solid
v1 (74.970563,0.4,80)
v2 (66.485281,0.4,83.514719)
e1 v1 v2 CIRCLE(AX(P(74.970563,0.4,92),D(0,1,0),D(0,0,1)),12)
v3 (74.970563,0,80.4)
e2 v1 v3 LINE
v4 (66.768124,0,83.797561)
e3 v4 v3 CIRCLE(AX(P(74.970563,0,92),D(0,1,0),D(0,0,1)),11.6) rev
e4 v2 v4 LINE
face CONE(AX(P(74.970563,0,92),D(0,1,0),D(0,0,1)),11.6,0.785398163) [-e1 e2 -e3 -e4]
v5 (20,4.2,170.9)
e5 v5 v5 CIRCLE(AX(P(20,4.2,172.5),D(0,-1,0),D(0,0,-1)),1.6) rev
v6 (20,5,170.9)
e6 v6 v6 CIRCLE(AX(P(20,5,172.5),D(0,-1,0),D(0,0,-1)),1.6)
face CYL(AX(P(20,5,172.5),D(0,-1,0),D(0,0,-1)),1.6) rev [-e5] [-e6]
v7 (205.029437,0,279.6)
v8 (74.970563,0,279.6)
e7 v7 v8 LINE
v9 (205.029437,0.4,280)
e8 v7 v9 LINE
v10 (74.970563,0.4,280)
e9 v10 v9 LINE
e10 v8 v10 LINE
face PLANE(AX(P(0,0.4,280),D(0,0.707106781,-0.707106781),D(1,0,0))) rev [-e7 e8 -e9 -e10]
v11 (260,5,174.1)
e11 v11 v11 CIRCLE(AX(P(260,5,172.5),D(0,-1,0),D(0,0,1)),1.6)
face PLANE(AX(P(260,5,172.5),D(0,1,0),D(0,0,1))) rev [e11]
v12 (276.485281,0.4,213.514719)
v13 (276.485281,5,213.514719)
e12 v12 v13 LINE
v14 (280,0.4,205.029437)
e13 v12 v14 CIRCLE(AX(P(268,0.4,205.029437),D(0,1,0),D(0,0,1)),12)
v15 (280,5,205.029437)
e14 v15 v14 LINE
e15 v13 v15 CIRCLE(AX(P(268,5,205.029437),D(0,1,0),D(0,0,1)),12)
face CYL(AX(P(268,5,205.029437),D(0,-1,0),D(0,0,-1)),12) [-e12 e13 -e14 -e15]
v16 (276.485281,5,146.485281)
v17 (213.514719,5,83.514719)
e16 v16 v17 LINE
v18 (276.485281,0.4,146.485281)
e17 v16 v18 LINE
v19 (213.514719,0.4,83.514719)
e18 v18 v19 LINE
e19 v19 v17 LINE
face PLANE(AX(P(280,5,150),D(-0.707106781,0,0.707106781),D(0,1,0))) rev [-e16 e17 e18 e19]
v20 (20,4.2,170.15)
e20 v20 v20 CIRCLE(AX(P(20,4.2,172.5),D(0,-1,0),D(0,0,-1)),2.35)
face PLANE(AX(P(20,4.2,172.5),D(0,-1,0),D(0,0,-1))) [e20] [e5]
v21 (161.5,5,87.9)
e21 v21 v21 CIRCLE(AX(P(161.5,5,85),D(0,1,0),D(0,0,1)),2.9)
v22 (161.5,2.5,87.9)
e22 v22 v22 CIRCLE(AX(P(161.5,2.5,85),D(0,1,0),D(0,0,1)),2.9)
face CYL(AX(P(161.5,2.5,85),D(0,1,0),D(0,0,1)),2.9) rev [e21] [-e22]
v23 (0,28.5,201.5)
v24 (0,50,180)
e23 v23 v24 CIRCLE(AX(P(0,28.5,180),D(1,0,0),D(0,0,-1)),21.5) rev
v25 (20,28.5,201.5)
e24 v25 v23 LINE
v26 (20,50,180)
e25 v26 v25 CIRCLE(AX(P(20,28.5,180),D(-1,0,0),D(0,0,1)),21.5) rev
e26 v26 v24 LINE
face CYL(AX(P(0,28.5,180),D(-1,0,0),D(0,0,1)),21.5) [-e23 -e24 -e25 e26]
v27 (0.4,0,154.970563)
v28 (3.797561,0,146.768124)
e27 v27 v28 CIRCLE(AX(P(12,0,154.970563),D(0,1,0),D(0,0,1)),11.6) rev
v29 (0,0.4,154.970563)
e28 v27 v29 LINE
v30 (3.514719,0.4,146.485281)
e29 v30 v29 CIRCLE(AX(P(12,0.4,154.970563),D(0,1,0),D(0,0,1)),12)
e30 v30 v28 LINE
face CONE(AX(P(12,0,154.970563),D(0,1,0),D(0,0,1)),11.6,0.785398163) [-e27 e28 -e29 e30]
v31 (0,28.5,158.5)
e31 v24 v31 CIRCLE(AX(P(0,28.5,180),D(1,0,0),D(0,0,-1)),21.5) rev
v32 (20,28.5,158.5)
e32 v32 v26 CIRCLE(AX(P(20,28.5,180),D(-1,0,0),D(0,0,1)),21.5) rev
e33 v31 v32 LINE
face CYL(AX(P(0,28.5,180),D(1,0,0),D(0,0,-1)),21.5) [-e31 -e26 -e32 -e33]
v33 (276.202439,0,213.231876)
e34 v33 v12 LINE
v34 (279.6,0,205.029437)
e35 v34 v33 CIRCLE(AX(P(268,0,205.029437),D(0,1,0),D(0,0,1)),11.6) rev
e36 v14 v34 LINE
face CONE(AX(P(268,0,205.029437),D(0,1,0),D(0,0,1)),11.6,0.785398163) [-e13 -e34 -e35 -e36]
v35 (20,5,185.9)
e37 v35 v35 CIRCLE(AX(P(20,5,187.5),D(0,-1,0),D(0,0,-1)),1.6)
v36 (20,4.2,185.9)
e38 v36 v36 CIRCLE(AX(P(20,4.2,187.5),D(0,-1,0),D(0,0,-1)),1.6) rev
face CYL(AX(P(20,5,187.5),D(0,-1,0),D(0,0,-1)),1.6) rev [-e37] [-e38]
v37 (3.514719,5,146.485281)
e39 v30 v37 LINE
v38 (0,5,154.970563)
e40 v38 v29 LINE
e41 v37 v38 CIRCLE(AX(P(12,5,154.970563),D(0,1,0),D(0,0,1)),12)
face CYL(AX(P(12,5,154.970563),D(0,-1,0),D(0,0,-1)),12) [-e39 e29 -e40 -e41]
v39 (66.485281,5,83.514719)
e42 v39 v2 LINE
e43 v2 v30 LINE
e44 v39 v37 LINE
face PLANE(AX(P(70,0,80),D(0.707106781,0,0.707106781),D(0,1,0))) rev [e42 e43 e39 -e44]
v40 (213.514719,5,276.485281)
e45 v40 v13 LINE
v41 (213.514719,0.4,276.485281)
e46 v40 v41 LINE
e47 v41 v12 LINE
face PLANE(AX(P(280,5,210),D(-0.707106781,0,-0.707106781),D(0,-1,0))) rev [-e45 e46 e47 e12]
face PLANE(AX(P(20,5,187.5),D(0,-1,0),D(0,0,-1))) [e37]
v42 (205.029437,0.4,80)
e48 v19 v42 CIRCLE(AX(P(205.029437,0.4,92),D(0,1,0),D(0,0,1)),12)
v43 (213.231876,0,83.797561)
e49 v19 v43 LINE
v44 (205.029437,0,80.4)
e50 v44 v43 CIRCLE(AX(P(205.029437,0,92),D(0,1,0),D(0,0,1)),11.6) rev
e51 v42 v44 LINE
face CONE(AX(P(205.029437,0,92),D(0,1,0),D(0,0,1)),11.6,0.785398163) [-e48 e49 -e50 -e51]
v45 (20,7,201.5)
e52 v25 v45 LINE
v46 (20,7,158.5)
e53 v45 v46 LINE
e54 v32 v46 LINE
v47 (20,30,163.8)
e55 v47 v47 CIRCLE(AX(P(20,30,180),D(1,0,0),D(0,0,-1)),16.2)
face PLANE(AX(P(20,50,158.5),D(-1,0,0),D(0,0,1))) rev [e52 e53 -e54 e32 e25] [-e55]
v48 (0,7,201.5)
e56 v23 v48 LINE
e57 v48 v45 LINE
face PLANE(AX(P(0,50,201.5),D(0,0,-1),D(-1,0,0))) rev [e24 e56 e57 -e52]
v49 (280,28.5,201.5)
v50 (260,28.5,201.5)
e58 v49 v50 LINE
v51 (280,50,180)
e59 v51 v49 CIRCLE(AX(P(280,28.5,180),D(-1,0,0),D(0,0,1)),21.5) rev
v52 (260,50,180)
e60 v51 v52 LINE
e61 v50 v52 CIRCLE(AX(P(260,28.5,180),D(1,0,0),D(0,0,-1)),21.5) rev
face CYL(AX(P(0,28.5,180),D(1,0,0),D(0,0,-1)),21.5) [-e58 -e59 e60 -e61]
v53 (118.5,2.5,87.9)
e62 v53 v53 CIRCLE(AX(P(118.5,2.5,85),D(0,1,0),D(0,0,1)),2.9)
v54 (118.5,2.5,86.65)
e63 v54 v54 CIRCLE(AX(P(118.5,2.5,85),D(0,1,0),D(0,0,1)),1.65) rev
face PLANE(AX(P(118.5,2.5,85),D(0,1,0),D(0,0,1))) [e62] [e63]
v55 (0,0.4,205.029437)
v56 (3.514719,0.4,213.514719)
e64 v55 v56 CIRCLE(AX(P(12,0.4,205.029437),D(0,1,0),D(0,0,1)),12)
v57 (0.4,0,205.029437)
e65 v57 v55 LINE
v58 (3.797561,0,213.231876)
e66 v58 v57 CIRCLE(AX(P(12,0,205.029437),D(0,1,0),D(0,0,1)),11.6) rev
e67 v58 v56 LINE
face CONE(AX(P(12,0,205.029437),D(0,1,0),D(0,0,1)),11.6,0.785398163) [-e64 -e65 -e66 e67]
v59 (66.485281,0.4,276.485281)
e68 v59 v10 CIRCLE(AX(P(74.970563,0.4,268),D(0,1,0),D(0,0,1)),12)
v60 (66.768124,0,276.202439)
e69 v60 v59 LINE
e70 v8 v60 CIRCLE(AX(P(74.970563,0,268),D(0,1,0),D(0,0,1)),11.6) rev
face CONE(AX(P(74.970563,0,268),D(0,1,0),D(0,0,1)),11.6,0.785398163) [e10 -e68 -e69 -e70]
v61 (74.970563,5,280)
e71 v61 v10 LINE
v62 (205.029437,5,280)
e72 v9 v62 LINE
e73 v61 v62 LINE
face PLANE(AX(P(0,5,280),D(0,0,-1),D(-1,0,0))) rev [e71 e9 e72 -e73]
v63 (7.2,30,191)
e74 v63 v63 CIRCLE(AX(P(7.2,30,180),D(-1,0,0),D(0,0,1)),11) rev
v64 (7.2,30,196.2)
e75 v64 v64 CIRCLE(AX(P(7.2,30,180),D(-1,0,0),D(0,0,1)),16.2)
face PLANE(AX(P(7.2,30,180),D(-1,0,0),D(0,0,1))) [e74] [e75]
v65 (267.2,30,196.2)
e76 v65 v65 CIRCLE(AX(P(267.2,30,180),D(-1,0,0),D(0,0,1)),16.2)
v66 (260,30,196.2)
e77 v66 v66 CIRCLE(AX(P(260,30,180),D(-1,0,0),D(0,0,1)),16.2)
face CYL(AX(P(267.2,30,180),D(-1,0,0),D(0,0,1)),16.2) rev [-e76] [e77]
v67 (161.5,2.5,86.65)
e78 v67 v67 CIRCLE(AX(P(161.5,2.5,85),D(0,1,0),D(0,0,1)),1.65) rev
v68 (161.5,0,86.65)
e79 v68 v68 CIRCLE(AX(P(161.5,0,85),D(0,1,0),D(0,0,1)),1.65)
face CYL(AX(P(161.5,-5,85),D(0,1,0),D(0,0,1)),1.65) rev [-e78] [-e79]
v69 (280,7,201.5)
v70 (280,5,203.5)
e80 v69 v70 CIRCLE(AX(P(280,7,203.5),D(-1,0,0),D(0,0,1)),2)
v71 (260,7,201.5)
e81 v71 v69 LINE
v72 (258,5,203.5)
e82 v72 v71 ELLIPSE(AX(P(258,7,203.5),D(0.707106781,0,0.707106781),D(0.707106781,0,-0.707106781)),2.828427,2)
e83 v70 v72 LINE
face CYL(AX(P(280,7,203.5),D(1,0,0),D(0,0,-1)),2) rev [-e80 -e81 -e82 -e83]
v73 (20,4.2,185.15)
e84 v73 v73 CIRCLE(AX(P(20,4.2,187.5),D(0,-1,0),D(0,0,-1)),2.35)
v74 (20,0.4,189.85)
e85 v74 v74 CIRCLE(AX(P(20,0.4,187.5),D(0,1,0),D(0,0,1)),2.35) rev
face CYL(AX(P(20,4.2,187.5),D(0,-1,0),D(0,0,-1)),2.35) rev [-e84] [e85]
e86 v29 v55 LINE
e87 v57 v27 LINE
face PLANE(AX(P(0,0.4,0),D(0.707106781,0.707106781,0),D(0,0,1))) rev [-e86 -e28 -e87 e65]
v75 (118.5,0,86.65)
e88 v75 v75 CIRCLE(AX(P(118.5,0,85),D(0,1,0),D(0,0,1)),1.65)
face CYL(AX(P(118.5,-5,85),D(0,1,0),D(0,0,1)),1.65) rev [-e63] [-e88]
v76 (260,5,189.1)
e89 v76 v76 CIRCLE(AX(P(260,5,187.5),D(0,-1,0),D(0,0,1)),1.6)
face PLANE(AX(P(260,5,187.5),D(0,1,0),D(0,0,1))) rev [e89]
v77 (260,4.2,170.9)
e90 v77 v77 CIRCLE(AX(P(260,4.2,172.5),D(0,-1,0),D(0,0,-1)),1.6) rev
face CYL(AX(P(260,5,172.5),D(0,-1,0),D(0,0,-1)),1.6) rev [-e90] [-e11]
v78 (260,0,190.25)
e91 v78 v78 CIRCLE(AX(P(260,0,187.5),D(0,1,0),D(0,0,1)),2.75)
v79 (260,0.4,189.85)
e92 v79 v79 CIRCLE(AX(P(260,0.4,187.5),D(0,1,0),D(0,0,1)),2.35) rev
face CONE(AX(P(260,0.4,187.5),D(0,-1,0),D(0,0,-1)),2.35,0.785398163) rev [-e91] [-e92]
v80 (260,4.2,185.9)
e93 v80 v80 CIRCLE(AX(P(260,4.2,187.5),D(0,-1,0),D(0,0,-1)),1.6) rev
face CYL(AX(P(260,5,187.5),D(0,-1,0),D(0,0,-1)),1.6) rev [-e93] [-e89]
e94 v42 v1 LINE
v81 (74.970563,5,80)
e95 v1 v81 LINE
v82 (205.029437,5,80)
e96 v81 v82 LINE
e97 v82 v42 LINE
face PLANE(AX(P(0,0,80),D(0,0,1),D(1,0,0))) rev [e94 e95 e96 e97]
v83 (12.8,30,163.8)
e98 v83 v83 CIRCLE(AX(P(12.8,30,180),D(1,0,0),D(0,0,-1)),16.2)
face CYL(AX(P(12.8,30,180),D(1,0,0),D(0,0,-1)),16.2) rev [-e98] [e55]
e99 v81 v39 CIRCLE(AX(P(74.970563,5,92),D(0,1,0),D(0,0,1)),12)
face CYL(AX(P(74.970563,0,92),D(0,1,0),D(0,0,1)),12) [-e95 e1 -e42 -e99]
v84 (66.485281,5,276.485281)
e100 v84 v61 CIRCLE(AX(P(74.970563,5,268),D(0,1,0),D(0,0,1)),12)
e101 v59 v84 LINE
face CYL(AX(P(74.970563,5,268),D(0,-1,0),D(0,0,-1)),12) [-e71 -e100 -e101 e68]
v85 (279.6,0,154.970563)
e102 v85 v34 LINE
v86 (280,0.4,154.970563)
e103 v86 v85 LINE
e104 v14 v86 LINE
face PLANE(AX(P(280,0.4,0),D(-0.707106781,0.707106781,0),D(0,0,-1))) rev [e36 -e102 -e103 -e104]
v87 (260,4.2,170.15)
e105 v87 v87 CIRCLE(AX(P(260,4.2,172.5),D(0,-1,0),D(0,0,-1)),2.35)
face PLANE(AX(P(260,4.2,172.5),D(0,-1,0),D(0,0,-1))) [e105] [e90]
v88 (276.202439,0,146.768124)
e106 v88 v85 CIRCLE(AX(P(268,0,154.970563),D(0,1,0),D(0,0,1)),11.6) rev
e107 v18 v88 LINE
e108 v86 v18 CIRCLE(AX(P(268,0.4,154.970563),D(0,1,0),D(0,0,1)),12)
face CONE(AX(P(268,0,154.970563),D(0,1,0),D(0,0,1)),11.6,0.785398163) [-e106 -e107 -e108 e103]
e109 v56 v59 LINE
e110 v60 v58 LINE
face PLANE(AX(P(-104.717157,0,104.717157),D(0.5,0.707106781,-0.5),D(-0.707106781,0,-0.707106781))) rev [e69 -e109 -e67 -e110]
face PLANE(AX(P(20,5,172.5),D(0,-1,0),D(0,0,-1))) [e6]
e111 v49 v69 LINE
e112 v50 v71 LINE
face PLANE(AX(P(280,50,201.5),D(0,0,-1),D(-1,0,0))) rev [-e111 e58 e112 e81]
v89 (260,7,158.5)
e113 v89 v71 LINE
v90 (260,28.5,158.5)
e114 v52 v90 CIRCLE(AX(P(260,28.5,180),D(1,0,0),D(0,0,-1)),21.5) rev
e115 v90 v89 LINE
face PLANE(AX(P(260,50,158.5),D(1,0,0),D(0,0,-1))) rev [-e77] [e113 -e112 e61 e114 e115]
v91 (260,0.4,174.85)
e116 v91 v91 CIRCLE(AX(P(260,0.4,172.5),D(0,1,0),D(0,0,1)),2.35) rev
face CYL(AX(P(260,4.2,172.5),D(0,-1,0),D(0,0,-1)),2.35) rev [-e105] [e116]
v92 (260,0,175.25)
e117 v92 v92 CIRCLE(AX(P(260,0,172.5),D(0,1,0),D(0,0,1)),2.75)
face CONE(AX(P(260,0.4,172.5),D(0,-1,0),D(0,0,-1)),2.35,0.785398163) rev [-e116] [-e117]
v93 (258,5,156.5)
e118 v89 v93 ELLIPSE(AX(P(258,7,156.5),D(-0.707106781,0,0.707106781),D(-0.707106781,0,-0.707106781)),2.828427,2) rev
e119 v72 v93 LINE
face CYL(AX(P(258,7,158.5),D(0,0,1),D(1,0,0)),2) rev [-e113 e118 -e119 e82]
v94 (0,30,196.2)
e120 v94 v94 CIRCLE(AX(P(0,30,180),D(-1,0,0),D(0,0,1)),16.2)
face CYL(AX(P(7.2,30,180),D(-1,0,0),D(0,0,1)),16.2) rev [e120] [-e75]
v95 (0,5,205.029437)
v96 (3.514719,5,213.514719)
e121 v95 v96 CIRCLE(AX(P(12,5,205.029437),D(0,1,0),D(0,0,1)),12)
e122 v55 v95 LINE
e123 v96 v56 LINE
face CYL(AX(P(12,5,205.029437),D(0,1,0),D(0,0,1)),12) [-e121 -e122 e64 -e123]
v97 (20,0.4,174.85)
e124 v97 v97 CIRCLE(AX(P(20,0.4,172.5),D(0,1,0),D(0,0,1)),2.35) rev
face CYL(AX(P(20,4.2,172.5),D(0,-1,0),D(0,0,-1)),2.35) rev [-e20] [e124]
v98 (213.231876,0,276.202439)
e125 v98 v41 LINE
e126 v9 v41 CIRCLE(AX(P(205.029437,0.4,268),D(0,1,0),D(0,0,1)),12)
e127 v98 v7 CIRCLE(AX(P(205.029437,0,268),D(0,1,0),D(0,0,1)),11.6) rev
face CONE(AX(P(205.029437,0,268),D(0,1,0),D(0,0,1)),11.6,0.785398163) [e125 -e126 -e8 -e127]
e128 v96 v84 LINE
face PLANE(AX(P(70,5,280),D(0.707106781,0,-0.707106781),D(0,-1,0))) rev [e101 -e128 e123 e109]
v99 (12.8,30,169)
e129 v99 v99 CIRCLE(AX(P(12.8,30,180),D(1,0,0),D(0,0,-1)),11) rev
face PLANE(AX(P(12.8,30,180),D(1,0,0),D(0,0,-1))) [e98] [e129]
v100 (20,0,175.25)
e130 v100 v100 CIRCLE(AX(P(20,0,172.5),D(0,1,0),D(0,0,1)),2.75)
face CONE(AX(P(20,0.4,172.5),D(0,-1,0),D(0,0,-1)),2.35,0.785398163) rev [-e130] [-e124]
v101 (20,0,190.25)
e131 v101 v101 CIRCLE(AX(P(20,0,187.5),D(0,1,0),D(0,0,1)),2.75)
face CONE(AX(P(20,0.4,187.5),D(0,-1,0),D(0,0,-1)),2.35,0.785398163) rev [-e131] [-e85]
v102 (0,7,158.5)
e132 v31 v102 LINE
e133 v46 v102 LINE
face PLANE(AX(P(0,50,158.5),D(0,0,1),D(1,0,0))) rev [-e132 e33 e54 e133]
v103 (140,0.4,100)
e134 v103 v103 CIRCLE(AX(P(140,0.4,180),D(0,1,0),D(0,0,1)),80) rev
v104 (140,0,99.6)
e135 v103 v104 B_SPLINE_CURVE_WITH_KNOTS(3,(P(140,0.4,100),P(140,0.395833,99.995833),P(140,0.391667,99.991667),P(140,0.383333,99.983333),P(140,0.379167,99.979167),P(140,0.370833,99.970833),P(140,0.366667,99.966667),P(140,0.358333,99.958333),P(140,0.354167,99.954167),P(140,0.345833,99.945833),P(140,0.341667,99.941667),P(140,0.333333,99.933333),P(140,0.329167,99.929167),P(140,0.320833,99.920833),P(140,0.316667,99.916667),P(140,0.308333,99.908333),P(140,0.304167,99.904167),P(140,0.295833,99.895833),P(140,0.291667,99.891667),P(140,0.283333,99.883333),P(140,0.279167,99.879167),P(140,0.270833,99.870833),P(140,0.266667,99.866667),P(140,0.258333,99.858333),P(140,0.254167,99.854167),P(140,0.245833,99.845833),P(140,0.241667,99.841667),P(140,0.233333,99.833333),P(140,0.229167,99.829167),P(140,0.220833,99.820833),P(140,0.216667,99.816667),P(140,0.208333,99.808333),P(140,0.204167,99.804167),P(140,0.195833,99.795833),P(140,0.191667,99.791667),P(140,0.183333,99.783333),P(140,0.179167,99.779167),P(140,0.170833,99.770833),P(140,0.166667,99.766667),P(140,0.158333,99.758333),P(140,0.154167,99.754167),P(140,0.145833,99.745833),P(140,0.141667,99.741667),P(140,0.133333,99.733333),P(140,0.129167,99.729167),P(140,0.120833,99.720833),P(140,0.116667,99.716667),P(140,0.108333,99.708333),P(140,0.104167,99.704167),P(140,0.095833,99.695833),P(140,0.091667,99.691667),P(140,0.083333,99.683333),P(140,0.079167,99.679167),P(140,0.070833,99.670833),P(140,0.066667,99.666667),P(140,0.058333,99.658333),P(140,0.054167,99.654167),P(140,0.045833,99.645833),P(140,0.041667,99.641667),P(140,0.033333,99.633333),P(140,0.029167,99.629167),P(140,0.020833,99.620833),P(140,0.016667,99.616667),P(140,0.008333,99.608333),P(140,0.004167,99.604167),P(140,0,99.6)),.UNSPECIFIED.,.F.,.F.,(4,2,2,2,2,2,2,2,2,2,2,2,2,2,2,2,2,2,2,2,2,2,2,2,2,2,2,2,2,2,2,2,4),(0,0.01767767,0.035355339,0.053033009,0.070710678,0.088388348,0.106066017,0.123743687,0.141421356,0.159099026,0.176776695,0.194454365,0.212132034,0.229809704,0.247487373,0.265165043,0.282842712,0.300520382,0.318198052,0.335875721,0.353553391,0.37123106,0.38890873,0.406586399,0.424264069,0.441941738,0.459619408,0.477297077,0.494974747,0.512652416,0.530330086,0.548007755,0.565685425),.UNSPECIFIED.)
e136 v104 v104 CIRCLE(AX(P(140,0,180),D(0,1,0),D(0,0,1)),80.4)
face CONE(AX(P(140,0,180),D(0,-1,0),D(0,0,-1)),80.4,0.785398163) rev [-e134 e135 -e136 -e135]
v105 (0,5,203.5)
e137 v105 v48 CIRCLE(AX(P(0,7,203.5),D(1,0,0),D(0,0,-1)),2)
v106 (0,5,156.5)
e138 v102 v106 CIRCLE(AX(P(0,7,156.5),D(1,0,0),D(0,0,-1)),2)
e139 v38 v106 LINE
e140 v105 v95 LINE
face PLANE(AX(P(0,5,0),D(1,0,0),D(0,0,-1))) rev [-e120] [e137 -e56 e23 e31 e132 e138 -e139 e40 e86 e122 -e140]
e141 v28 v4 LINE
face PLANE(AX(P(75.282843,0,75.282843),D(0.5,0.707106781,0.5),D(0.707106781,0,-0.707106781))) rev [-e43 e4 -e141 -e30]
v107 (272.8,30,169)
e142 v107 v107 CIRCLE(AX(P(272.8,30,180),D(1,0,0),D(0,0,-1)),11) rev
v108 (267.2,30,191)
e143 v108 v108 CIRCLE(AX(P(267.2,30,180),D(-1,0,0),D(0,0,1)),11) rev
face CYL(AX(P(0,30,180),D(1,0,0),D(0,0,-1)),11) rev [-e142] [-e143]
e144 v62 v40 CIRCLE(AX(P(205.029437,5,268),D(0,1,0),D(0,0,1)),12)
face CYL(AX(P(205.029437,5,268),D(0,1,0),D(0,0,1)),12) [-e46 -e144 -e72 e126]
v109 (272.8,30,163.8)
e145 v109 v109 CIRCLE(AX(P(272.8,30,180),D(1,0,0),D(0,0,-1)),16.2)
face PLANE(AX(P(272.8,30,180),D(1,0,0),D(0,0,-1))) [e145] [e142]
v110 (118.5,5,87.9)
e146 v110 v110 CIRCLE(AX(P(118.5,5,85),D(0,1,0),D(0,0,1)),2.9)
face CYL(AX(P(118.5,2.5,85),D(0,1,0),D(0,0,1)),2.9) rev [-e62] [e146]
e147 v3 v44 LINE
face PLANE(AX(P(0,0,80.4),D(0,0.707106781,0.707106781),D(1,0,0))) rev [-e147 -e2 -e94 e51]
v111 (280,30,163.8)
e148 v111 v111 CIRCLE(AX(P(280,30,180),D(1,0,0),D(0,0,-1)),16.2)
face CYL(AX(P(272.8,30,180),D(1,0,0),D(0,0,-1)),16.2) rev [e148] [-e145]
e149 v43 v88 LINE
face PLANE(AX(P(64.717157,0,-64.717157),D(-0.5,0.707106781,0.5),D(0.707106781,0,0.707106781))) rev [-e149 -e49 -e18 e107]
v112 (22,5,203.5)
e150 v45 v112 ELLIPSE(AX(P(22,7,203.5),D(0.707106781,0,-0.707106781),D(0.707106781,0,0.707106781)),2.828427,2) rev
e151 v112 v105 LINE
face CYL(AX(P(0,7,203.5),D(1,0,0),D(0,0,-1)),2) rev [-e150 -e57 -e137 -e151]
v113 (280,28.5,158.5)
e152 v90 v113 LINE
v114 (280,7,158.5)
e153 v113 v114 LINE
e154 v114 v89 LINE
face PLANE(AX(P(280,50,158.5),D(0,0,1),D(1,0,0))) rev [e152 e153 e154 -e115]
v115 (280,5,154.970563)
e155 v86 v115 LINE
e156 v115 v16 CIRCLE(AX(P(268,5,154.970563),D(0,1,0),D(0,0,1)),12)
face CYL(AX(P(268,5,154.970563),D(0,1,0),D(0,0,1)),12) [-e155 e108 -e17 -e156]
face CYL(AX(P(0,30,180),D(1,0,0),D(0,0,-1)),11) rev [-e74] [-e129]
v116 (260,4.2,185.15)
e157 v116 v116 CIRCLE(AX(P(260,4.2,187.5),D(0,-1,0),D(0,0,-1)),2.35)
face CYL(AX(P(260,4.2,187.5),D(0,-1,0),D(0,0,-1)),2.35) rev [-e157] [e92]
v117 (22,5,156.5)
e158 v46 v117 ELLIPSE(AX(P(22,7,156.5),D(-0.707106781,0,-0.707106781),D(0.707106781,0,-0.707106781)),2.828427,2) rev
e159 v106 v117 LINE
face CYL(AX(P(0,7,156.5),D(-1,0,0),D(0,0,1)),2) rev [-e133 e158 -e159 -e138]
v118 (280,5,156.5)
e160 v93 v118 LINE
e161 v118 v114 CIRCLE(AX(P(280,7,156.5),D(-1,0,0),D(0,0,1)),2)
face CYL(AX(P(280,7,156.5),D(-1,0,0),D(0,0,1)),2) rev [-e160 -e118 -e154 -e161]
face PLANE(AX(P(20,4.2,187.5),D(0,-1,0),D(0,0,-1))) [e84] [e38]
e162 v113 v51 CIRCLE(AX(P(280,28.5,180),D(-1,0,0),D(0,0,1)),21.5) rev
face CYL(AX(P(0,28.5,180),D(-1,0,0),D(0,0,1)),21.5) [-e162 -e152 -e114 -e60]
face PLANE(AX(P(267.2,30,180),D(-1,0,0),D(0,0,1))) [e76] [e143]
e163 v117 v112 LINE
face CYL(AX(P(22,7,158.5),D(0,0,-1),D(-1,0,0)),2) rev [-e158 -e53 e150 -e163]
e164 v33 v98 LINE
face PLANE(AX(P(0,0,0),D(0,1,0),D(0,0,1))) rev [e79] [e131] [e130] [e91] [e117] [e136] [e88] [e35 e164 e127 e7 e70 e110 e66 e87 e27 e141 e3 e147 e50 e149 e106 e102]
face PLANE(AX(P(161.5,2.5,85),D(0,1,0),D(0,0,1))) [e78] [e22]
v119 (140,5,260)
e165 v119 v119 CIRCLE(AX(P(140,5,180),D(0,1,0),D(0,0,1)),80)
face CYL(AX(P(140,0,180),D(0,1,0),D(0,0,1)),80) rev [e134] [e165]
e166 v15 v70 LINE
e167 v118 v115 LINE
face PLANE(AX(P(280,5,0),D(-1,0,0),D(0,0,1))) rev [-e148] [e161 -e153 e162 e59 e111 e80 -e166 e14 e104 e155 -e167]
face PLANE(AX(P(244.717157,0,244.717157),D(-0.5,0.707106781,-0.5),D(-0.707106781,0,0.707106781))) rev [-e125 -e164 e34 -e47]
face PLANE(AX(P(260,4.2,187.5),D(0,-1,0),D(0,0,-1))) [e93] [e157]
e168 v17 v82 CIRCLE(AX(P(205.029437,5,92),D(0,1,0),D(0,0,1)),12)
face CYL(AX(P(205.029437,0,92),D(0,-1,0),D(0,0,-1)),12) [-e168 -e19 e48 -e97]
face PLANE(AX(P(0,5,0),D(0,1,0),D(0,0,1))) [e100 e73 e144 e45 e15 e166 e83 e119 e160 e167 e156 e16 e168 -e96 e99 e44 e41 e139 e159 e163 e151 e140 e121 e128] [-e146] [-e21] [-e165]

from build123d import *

# Parameters (mm, degrees)
SKETCH_1_W           = 280
SKETCH_1_H           = 280
EXTRUDE_1_DEPTH      = 5
SKETCH_2_R           = 80
CUT_EXTRUDE_1_DEPTH  = 5
SKETCH_3_W           = 20
SKETCH_3_H           = 43
EXTRUDE_2_DEPTH      = 45
SKETCH_4_R           = 11
CUT_EXTRUDE_2_DEPTH  = 400.12404087
SKETCH_5_R           = 16.2
CUT_EXTRUDE_3_DEPTH  = 7.2
CUT_EXTRUDE_START    = -7.2
SKETCH_6_R           = 16.2
CUT_EXTRUDE_4_DEPTH  = 7.2
SKETCH_7_R           = 16.2
CUT_EXTRUDE_5_DEPTH  = 7.2
SKETCH_8_R           = 16.2
CUT_EXTRUDE_6_DEPTH  = 7.2
SKETCH_9_W           = 280
SKETCH_9_H           = 80
CUT_EXTRUDE_7_DEPTH  = 399.52854352
CHAMFER_1_SIZE       = 70
FILLET_1_R           = 21.5
FILLET_2_R           = 12
FILLET_3_R           = 2
SKETCH_10_R          = 1.6
CUT_EXTRUDE_8_DEPTH  = 5
SKETCH_11_R          = 2.35
CUT_EXTRUDE_9_DEPTH  = 4.2
CHAMFER_4_SIZE       = 0.4
SKETCH_12_R          = 1.65
CUT_EXTRUDE_10_DEPTH = 10
SKETCH_13_R          = 2.9
CUT_EXTRUDE_11_DEPTH = 2.5


with BuildPart() as part:
    # 草图1 → 凸台-拉伸1 (new body)
    with BuildSketch(Plane(origin=(0, 0, 0), x_dir=(1, 0, 0), z_dir=(0, 1, 0))):
        with Locations((140, -140)):
            Rectangle(SKETCH_1_W, SKETCH_1_H)
    extrude(amount=EXTRUDE_1_DEPTH)

    # 草图2 → 切除-拉伸1 (cut)
    with BuildSketch(Plane(origin=(0, 5, 0), x_dir=(1, 0, 0), z_dir=(0, 1, 0))):
        with Locations(Location((140, -180, 0), (0, 0, 270))):
            Circle(SKETCH_2_R)
    extrude(amount=-CUT_EXTRUDE_1_DEPTH, mode=Mode.SUBTRACT)

    # 草图3 → 凸台-拉伸2 (add)
    with BuildSketch(Plane(origin=(0, 5, 0), x_dir=(1, 0, 0), z_dir=(0, 1, 0))):
        with Locations((10, -180)):
            Rectangle(SKETCH_3_W, SKETCH_3_H)
        with Locations((270, -180)):
            Rectangle(SKETCH_3_W, SKETCH_3_H)
    extrude(amount=EXTRUDE_2_DEPTH)

    # 草图4 → 切除-拉伸2 (cut, through all)
    with BuildSketch(Plane(origin=(280, 0, 0), x_dir=(0, 0, -1), z_dir=(1, 0, 0))):
        with Locations((-180, 30)):
            Circle(SKETCH_4_R)
    extrude(amount=-CUT_EXTRUDE_2_DEPTH, mode=Mode.SUBTRACT)

    # 草图5 → 切除-拉伸3 (cut)
    with BuildSketch(Plane(origin=(280, 0, 0), x_dir=(0, 0, -1), z_dir=(1, 0, 0))):
        with Locations((-180, 30)):
            Circle(SKETCH_5_R)
    extrude(amount=-CUT_EXTRUDE_3_DEPTH, mode=Mode.SUBTRACT)

    # 草图6 → 切除-拉伸4 (cut)
    with BuildSketch(Plane.ZY.offset(-260).offset(CUT_EXTRUDE_START)):
        with Locations(Location((180, 30, 0), (0, 0, 180))):
            Circle(SKETCH_6_R)
    extrude(amount=CUT_EXTRUDE_4_DEPTH, mode=Mode.SUBTRACT)

    # 草图7 → 切除-拉伸5 (cut)
    with BuildSketch(Plane(origin=(20, 0, 0), x_dir=(0, 0, -1), z_dir=(1, 0, 0))):
        with Locations((-180, 30)):
            Circle(SKETCH_7_R)
    extrude(amount=-CUT_EXTRUDE_5_DEPTH, mode=Mode.SUBTRACT)

    # 草图8 → 切除-拉伸6 (cut)
    with BuildSketch(Plane.ZY.offset(CUT_EXTRUDE_START)):
        with Locations(Location((180, 30, 0), (0, 0, 180))):
            Circle(SKETCH_8_R)
    extrude(amount=CUT_EXTRUDE_6_DEPTH, mode=Mode.SUBTRACT)

    # 草图9 → 切除-拉伸7 (cut, through all)
    with BuildSketch(Plane(origin=(0, 5, 0), x_dir=(1, 0, 0), z_dir=(0, 1, 0))):
        with Locations((140, -40)):
            Rectangle(SKETCH_9_W, SKETCH_9_H)
    extrude(amount=-CUT_EXTRUDE_7_DEPTH, mode=Mode.SUBTRACT)

    # 倒角1
    chamfer_1_edges = [part.edges().sort_by_distance(p)[0] for p in [
        (280, 2.5, 280),
        (0, 2.5, 280),
        (0, 2.5, 80),
        (280, 2.5, 80),
    ]]
    chamfer(chamfer_1_edges, length=CHAMFER_1_SIZE)

    # 圆角1
    fillet_1_edges = [part.edges().sort_by_distance(p)[0] for p in [
        (270, 50, 201.5),
        (270, 50, 158.5),
        (10, 50, 201.5),
        (10, 50, 158.5),
    ]]
    fillet(fillet_1_edges, radius=FILLET_1_R - 0.0001)  # a hair under: the kernel refuses the full size

    # 圆角2
    fillet_2_edges = [part.edges().sort_by_distance(p)[0] for p in [
        (280, 2.5, 210),
        (280, 2.5, 150),
        (70, 2.5, 80),
        (210, 2.5, 80),
        (70, 2.5, 280),
        (210, 2.5, 280),
        (0, 2.5, 150),
        (0, 2.5, 210),
    ]]
    fillet(fillet_2_edges, radius=FILLET_2_R)

    # 圆角3
    fillet_3_edges = [part.edges().sort_by_distance(p)[0] for p in [
        (10, 5, 201.5),
        (20, 5, 180),
        (10, 5, 158.5),
        (270, 5, 158.5),
        (260, 5, 180),
        (270, 5, 201.5),
    ]]
    fillet(fillet_3_edges, radius=FILLET_3_R)

    # 草图10 → 切除-拉伸8 (cut)
    with BuildSketch(Plane(origin=(0, 0, 0), x_dir=(-1, 0, 0), z_dir=(0, -1, 0))):
        with Locations(Location((-20, -187.5, 0), (0, 0, 90))):
            Circle(SKETCH_10_R)
        with Locations(Location((-20, -172.5, 0), (0, 0, 90))):
            Circle(SKETCH_10_R)
        with Locations(Location((-260, -187.5, 0), (0, 0, 270))):
            Circle(SKETCH_10_R)
        with Locations(Location((-260, -172.5, 0), (0, 0, 270))):
            Circle(SKETCH_10_R)
    extrude(amount=-CUT_EXTRUDE_8_DEPTH, mode=Mode.SUBTRACT)

    # 草图11 → 切除-拉伸9 (cut)
    with BuildSketch(Plane(origin=(0, 0, 0), x_dir=(-1, 0, 0), z_dir=(0, -1, 0))):
        with Locations(Location((-20, -172.5, 0), (0, 0, 90))):
            Circle(SKETCH_11_R)
        with Locations(Location((-20, -187.5, 0), (0, 0, 90))):
            Circle(SKETCH_11_R)
        with Locations(Location((-260, -172.5, 0), (0, 0, 90))):
            Circle(SKETCH_11_R)
        with Locations(Location((-260, -187.5, 0), (0, 0, 90))):
            Circle(SKETCH_11_R)
    extrude(amount=-CUT_EXTRUDE_9_DEPTH, mode=Mode.SUBTRACT)

    # 倒角4
    chamfer_4_edges = [part.edges().sort_by_distance(p)[0] for p in [
        (140, 0, 80),
        (140, 0, 100),
        (35, 0, 115),
        (245, 0, 115),
        (280, 0, 180),
        (245, 0, 245),
        (140, 0, 280),
        (35, 0, 245),
        (0, 0, 180),
        (0.91344561, 0, 150.37836156),
        (0.91344561, 0, 209.62163844),
        (70.37836156, 0, 279.08655439),
        (209.62163844, 0, 279.08655439),
        (279.08655439, 0, 209.62163844),
        (279.08655439, 0, 150.37836156),
        (209.62163844, 0, 80.91344561),
        (70.37836156, 0, 80.91344561),
        (20, 0, 189.85),
        (260, 0, 174.85),
        (260, 0, 189.85),
        (20, 0, 174.85),
    ]]
    chamfer(chamfer_4_edges, length=CHAMFER_4_SIZE)

    # 草图12 → 切除-拉伸10 (cut)
    with BuildSketch(Plane(origin=(0, 5, 0), x_dir=(1, 0, 0), z_dir=(0, 1, 0))):
        with Locations(Location((118.5, -85, 0), (0, 0, 270))):
            Circle(SKETCH_12_R)
        with Locations(Location((161.5, -85, 0), (0, 0, 270))):
            Circle(SKETCH_12_R)
    extrude(amount=-CUT_EXTRUDE_10_DEPTH, mode=Mode.SUBTRACT)

    # 草图13 → 切除-拉伸11 (cut)
    with BuildSketch(Plane(origin=(0, 5, 0), x_dir=(1, 0, 0), z_dir=(0, 1, 0))):
        with Locations(Location((118.5, -85, 0), (0, 0, 270))):
            Circle(SKETCH_13_R)
        with Locations(Location((161.5, -85, 0), (0, 0, 270))):
            Circle(SKETCH_13_R)
    extrude(amount=-CUT_EXTRUDE_11_DEPTH, mode=Mode.SUBTRACT)


solid = part.part
